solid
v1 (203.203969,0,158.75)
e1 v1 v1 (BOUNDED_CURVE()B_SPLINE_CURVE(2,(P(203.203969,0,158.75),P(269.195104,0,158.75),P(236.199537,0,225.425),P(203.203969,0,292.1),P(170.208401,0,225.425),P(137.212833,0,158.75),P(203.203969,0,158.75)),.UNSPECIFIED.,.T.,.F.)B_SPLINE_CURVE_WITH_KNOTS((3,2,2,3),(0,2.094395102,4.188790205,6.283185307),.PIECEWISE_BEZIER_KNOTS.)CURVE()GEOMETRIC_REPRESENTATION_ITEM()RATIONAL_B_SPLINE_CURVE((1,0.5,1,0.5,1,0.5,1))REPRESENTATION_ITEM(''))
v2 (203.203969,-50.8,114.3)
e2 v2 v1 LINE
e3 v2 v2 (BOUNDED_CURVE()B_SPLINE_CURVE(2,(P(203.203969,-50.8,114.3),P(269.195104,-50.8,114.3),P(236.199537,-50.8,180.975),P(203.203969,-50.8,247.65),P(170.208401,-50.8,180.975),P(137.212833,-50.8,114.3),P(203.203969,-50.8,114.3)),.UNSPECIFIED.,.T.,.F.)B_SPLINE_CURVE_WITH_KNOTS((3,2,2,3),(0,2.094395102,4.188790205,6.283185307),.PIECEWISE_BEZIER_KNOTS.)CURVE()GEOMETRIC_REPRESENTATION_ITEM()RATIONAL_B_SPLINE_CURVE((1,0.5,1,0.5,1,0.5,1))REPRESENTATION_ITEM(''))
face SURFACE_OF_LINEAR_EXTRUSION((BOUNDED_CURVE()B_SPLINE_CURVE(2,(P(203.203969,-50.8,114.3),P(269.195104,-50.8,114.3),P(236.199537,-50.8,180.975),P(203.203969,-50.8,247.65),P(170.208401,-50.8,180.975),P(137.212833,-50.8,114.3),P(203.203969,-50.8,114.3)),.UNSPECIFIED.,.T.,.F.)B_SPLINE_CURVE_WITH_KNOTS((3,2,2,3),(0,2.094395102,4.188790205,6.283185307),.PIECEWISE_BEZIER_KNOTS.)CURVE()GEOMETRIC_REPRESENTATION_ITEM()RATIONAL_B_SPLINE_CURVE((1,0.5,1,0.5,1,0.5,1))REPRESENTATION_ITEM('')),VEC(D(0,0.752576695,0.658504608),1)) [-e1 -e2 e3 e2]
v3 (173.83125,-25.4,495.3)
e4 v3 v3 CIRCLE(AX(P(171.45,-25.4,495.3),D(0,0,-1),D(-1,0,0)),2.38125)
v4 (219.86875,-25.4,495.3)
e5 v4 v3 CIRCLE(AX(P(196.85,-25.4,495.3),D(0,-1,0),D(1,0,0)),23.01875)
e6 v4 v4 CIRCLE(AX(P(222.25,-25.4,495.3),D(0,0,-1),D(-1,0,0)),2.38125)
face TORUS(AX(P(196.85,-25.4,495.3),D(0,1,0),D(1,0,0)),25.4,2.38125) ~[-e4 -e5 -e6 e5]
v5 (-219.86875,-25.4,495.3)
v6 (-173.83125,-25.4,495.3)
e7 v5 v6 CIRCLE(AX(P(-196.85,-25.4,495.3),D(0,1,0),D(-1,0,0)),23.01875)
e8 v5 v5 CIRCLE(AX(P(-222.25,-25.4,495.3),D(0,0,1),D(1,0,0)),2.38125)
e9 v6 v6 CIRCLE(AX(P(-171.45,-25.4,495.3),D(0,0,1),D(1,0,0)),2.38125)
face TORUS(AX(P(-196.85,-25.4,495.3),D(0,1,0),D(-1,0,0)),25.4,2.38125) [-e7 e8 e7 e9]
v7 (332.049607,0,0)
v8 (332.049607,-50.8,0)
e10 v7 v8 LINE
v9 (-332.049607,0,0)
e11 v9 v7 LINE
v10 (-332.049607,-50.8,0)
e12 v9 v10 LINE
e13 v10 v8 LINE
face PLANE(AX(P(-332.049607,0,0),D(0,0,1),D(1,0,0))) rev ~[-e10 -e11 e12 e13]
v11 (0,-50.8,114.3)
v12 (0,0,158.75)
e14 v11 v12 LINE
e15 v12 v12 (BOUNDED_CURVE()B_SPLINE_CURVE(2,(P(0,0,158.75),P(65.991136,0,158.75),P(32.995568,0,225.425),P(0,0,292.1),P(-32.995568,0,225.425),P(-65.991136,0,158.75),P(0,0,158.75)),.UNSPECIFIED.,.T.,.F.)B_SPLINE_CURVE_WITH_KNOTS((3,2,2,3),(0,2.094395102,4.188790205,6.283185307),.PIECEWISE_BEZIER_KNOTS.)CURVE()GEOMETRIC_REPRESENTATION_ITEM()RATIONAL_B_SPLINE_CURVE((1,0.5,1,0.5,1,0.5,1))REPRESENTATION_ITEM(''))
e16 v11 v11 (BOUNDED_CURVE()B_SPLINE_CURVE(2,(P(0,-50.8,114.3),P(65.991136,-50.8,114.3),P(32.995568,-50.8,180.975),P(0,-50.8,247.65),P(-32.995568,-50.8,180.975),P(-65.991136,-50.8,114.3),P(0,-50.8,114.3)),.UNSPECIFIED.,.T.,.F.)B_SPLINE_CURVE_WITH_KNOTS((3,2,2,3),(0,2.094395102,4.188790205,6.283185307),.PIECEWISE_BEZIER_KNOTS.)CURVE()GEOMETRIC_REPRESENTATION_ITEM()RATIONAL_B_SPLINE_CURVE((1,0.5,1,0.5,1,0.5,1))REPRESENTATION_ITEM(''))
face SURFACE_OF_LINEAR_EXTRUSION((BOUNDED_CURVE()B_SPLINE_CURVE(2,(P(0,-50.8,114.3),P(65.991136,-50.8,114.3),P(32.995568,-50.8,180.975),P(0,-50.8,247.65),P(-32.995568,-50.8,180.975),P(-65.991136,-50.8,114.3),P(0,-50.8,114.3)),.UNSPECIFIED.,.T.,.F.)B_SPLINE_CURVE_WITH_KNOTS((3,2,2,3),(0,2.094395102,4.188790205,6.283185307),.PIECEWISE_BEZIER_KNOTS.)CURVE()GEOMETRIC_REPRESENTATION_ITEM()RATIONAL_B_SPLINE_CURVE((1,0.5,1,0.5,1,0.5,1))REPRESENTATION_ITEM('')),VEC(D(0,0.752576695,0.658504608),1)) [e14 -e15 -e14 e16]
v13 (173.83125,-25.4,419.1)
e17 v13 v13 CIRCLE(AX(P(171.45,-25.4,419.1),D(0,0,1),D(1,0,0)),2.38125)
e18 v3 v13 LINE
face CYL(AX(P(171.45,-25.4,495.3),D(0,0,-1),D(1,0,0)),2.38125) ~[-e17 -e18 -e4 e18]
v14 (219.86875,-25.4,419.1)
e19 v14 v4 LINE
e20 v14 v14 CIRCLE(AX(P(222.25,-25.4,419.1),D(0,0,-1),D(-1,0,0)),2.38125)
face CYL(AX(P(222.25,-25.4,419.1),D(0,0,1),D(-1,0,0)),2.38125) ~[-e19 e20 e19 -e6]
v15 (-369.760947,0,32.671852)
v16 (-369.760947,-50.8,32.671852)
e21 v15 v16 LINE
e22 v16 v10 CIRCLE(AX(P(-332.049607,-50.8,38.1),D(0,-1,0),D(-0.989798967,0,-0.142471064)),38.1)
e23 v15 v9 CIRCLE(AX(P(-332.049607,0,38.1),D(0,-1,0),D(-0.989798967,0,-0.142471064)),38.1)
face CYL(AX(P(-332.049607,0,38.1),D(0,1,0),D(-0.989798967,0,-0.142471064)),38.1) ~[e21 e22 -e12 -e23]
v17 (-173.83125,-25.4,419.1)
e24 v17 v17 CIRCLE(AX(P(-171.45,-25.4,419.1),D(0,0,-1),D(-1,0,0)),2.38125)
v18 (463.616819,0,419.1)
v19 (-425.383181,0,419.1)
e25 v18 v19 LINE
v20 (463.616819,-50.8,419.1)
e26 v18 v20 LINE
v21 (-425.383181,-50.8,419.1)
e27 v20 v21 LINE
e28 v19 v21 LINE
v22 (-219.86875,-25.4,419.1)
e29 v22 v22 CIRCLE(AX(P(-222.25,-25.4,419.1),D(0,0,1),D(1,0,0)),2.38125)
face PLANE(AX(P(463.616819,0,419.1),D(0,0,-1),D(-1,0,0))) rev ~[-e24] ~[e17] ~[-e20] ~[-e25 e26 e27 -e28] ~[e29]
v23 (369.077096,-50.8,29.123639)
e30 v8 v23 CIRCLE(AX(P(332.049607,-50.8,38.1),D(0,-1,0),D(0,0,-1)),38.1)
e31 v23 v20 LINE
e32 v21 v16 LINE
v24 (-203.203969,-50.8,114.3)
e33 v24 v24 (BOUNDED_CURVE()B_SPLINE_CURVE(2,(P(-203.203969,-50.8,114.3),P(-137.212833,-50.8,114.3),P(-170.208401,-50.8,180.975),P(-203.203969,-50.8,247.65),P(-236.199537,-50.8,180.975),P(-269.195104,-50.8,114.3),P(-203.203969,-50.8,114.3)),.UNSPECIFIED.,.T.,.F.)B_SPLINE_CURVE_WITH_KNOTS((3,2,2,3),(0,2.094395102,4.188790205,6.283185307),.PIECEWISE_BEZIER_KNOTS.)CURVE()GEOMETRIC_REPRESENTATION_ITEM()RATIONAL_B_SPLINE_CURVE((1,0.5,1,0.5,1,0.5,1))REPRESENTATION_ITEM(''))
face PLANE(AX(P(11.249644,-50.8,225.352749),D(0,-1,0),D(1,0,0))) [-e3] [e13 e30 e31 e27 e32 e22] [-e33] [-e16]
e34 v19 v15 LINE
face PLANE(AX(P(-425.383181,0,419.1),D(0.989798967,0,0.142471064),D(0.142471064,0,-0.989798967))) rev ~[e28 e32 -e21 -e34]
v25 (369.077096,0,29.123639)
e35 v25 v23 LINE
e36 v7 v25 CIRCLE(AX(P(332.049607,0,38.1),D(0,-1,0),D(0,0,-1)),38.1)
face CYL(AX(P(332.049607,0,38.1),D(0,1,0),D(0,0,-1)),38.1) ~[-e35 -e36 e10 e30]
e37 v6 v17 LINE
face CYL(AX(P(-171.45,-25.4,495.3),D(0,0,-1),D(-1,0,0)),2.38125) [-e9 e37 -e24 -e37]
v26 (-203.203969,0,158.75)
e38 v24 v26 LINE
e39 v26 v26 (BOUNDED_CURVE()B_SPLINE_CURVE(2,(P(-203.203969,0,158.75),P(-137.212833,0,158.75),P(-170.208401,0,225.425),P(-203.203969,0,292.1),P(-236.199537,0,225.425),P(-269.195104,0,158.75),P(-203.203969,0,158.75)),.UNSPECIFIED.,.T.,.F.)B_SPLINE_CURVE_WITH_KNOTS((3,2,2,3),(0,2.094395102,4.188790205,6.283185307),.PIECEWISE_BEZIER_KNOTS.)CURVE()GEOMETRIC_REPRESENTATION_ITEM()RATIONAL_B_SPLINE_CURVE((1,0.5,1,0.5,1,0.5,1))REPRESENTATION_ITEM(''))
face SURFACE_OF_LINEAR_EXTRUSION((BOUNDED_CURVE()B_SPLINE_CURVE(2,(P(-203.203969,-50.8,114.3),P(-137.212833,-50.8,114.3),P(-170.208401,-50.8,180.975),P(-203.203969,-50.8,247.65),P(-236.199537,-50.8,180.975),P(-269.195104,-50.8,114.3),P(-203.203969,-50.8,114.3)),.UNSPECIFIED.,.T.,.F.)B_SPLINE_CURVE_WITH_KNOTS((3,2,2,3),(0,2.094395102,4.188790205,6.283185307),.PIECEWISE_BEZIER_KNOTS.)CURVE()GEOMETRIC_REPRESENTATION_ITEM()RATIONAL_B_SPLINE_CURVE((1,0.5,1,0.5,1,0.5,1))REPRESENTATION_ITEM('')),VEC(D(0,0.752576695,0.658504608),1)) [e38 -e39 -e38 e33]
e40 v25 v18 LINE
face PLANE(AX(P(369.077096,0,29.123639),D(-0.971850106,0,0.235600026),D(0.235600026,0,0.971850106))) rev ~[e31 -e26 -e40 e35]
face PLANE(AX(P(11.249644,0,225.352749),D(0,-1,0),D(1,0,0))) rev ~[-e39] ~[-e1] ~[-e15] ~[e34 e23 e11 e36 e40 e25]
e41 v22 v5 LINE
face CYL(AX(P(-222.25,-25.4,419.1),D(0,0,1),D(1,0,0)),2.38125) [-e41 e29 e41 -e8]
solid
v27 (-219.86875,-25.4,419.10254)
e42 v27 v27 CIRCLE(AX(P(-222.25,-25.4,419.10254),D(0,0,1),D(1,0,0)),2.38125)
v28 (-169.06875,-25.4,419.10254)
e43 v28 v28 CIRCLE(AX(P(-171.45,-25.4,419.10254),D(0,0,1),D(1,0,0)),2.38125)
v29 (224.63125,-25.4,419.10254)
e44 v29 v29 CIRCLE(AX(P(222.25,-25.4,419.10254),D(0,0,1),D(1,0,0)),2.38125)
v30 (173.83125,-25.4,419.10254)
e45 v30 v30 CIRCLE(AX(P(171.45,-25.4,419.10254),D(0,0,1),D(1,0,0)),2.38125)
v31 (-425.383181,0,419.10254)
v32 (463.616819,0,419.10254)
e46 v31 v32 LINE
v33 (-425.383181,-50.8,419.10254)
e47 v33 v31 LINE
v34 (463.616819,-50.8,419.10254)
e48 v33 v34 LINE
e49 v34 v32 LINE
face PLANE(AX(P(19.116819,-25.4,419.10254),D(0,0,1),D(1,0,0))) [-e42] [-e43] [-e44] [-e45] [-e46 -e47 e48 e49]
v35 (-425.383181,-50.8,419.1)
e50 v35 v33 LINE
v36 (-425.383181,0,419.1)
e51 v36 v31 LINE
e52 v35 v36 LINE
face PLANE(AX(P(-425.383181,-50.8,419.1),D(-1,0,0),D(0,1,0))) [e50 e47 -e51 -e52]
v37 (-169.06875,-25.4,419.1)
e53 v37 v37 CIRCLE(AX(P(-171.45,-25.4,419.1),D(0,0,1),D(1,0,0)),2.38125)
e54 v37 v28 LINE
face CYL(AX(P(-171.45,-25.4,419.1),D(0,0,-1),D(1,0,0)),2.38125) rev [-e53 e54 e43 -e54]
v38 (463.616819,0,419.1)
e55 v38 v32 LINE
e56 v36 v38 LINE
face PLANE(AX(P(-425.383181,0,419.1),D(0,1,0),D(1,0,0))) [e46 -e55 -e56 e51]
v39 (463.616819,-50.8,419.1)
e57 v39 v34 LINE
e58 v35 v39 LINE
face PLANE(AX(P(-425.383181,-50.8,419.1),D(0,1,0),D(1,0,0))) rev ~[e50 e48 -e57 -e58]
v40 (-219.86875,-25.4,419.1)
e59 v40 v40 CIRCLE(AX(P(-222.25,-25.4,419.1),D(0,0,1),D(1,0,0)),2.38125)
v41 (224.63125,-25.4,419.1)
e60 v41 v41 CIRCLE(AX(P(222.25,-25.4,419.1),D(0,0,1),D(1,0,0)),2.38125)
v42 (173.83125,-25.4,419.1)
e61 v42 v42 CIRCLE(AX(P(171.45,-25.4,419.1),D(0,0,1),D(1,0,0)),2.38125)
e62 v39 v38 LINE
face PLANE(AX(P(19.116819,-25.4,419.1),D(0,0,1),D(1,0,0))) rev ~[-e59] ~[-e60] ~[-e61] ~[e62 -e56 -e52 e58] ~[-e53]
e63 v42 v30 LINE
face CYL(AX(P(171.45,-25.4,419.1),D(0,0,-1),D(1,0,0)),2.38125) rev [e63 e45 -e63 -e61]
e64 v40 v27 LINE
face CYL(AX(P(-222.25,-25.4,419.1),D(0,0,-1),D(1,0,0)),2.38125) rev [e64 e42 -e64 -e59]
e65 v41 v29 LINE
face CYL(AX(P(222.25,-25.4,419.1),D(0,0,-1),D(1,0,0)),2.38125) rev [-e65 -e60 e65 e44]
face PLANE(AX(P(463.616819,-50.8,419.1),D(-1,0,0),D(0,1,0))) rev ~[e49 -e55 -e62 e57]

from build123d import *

# Parameters (mm, degrees)
F1_DEPTH = 50.8
F5_R     = 2.38125
F8_W     = 889
F8_H     = 50.8
F8_R     = 2.38125
F9_DEPTH = 0.00254


# Not quite as in the source:
# - a pattern or mirror of a feature is missing from the dataset's text; its kind, count and spacing are read off the source's solid


with BuildPart() as f1:
    # F0 (on Front) → F1 (new body)
    with BuildSketch(Plane.XZ):
        with BuildLine():
            Line((-425.3831805585, 419.1), (-369.7609472035, 32.6718524805))
            ThreePointArc((-369.7609472035, 32.6718524805), (-356.9975280935, 9.3039723183), (-332.0496065417, 0))
            Line((-332.0496065417, 0), (332.0496065417, 0))
            ThreePointArc((332.0496065417, 0), (355.6039123775, 8.1533027431), (369.0770955684, 29.1236390238))
            Line((369.0770955684, 29.1236390238), (463.6168194415, 419.1))
            Line((463.6168194415, 419.1), (-425.3831805585, 419.1))
        make_face()
    extrude(amount=F1_DEPTH)

    # F4: sweep along a path in F3
    with BuildLine(Plane.YZ) as f4_path:
        Line((-50.8, 158.75), (0, 203.2))
    # F2 (on face) → F4 (sweep, cut)
    with BuildSketch(Plane.XZ.offset(50.8)):
        with BuildLine():
            add(Edge.make_bspline(
                [(-203.2039687112, 114.3), (-137.2128329429, 114.3), (-170.2084008271, 180.975), (-203.2039687112, 247.65), (-236.1995365954, 180.975), (-269.1951044796, 114.3), (-203.2039687112, 114.3)],
                knots=[0, 0, 0, 2.0943951024, 2.0943951024, 4.1887902048, 4.1887902048, 6.2831853072, 6.2831853072, 6.2831853072], degree=2, weights=[1, 0.5, 1, 0.5, 1, 0.5, 1]))
        make_face()
        with BuildLine():
            add(Edge.make_bspline(
                [(0, 114.3), (65.9911357684, 114.3), (32.9955678842, 180.975), (0, 247.65), (-32.9955678842, 180.975), (-65.9911357684, 114.3), (0, 114.3)],
                knots=[0, 0, 0, 2.0943951024, 2.0943951024, 4.1887902048, 4.1887902048, 6.2831853072, 6.2831853072, 6.2831853072], degree=2, weights=[1, 0.5, 1, 0.5, 1, 0.5, 1]))
        make_face()
        with BuildLine():
            add(Edge.make_bspline(
                [(203.2039687112, 114.3), (269.1951044796, 114.3), (236.1995365954, 180.975), (203.2039687112, 247.65), (170.2084008271, 180.975), (137.2128329429, 114.3), (203.2039687112, 114.3)],
                knots=[0, 0, 0, 2.0943951024, 2.0943951024, 4.1887902048, 4.1887902048, 6.2831853072, 6.2831853072, 6.2831853072], degree=2, weights=[1, 0.5, 1, 0.5, 1, 0.5, 1]))
        make_face()
    sweep(path=f4_path.line, mode=Mode.SUBTRACT)

    # F7: sweep along a path in F6
    with BuildLine(Plane.XZ) as f7_path:
        Line((-222.25, 419.1), (-222.25, 495.3))
        ThreePointArc((-222.25, 495.3), (-196.85, 520.7), (-171.45, 495.3))
        Line((-171.45, 495.3), (-171.45, 419.1))
    # F5 (on face) → F7 (sweep)
    with BuildSketch(Plane.XY.offset(419.1)):
        with Locations((-222.25, -25.4)):
            Circle(F5_R)
    f7 = sweep(path=f7_path.line)

    # F7_copies: F7 across plane
    add(f7.mirror(Plane(origin=(0, 0, 0), x_dir=(0, 0, 1), z_dir=(1, 0, 0))))


with BuildPart() as f9:
    # F8 (on face) → F9 (new body)
    with BuildSketch(Plane.XY.offset(419.1)):
        with Locations((19.1168194415, -25.4)):
            Rectangle(F8_W, F8_H)
        with Locations((-222.25, -25.4)):
            Circle(F8_R, mode=Mode.SUBTRACT)
        with Locations((-171.45, -25.4)):
            Circle(F8_R, mode=Mode.SUBTRACT)
        with Locations((171.45, -25.4)):
            Circle(F8_R, mode=Mode.SUBTRACT)
        with Locations((222.25, -25.4)):
            Circle(F8_R, mode=Mode.SUBTRACT)
    extrude(amount=F9_DEPTH)


solid = Compound([f1.part, f9.part])
